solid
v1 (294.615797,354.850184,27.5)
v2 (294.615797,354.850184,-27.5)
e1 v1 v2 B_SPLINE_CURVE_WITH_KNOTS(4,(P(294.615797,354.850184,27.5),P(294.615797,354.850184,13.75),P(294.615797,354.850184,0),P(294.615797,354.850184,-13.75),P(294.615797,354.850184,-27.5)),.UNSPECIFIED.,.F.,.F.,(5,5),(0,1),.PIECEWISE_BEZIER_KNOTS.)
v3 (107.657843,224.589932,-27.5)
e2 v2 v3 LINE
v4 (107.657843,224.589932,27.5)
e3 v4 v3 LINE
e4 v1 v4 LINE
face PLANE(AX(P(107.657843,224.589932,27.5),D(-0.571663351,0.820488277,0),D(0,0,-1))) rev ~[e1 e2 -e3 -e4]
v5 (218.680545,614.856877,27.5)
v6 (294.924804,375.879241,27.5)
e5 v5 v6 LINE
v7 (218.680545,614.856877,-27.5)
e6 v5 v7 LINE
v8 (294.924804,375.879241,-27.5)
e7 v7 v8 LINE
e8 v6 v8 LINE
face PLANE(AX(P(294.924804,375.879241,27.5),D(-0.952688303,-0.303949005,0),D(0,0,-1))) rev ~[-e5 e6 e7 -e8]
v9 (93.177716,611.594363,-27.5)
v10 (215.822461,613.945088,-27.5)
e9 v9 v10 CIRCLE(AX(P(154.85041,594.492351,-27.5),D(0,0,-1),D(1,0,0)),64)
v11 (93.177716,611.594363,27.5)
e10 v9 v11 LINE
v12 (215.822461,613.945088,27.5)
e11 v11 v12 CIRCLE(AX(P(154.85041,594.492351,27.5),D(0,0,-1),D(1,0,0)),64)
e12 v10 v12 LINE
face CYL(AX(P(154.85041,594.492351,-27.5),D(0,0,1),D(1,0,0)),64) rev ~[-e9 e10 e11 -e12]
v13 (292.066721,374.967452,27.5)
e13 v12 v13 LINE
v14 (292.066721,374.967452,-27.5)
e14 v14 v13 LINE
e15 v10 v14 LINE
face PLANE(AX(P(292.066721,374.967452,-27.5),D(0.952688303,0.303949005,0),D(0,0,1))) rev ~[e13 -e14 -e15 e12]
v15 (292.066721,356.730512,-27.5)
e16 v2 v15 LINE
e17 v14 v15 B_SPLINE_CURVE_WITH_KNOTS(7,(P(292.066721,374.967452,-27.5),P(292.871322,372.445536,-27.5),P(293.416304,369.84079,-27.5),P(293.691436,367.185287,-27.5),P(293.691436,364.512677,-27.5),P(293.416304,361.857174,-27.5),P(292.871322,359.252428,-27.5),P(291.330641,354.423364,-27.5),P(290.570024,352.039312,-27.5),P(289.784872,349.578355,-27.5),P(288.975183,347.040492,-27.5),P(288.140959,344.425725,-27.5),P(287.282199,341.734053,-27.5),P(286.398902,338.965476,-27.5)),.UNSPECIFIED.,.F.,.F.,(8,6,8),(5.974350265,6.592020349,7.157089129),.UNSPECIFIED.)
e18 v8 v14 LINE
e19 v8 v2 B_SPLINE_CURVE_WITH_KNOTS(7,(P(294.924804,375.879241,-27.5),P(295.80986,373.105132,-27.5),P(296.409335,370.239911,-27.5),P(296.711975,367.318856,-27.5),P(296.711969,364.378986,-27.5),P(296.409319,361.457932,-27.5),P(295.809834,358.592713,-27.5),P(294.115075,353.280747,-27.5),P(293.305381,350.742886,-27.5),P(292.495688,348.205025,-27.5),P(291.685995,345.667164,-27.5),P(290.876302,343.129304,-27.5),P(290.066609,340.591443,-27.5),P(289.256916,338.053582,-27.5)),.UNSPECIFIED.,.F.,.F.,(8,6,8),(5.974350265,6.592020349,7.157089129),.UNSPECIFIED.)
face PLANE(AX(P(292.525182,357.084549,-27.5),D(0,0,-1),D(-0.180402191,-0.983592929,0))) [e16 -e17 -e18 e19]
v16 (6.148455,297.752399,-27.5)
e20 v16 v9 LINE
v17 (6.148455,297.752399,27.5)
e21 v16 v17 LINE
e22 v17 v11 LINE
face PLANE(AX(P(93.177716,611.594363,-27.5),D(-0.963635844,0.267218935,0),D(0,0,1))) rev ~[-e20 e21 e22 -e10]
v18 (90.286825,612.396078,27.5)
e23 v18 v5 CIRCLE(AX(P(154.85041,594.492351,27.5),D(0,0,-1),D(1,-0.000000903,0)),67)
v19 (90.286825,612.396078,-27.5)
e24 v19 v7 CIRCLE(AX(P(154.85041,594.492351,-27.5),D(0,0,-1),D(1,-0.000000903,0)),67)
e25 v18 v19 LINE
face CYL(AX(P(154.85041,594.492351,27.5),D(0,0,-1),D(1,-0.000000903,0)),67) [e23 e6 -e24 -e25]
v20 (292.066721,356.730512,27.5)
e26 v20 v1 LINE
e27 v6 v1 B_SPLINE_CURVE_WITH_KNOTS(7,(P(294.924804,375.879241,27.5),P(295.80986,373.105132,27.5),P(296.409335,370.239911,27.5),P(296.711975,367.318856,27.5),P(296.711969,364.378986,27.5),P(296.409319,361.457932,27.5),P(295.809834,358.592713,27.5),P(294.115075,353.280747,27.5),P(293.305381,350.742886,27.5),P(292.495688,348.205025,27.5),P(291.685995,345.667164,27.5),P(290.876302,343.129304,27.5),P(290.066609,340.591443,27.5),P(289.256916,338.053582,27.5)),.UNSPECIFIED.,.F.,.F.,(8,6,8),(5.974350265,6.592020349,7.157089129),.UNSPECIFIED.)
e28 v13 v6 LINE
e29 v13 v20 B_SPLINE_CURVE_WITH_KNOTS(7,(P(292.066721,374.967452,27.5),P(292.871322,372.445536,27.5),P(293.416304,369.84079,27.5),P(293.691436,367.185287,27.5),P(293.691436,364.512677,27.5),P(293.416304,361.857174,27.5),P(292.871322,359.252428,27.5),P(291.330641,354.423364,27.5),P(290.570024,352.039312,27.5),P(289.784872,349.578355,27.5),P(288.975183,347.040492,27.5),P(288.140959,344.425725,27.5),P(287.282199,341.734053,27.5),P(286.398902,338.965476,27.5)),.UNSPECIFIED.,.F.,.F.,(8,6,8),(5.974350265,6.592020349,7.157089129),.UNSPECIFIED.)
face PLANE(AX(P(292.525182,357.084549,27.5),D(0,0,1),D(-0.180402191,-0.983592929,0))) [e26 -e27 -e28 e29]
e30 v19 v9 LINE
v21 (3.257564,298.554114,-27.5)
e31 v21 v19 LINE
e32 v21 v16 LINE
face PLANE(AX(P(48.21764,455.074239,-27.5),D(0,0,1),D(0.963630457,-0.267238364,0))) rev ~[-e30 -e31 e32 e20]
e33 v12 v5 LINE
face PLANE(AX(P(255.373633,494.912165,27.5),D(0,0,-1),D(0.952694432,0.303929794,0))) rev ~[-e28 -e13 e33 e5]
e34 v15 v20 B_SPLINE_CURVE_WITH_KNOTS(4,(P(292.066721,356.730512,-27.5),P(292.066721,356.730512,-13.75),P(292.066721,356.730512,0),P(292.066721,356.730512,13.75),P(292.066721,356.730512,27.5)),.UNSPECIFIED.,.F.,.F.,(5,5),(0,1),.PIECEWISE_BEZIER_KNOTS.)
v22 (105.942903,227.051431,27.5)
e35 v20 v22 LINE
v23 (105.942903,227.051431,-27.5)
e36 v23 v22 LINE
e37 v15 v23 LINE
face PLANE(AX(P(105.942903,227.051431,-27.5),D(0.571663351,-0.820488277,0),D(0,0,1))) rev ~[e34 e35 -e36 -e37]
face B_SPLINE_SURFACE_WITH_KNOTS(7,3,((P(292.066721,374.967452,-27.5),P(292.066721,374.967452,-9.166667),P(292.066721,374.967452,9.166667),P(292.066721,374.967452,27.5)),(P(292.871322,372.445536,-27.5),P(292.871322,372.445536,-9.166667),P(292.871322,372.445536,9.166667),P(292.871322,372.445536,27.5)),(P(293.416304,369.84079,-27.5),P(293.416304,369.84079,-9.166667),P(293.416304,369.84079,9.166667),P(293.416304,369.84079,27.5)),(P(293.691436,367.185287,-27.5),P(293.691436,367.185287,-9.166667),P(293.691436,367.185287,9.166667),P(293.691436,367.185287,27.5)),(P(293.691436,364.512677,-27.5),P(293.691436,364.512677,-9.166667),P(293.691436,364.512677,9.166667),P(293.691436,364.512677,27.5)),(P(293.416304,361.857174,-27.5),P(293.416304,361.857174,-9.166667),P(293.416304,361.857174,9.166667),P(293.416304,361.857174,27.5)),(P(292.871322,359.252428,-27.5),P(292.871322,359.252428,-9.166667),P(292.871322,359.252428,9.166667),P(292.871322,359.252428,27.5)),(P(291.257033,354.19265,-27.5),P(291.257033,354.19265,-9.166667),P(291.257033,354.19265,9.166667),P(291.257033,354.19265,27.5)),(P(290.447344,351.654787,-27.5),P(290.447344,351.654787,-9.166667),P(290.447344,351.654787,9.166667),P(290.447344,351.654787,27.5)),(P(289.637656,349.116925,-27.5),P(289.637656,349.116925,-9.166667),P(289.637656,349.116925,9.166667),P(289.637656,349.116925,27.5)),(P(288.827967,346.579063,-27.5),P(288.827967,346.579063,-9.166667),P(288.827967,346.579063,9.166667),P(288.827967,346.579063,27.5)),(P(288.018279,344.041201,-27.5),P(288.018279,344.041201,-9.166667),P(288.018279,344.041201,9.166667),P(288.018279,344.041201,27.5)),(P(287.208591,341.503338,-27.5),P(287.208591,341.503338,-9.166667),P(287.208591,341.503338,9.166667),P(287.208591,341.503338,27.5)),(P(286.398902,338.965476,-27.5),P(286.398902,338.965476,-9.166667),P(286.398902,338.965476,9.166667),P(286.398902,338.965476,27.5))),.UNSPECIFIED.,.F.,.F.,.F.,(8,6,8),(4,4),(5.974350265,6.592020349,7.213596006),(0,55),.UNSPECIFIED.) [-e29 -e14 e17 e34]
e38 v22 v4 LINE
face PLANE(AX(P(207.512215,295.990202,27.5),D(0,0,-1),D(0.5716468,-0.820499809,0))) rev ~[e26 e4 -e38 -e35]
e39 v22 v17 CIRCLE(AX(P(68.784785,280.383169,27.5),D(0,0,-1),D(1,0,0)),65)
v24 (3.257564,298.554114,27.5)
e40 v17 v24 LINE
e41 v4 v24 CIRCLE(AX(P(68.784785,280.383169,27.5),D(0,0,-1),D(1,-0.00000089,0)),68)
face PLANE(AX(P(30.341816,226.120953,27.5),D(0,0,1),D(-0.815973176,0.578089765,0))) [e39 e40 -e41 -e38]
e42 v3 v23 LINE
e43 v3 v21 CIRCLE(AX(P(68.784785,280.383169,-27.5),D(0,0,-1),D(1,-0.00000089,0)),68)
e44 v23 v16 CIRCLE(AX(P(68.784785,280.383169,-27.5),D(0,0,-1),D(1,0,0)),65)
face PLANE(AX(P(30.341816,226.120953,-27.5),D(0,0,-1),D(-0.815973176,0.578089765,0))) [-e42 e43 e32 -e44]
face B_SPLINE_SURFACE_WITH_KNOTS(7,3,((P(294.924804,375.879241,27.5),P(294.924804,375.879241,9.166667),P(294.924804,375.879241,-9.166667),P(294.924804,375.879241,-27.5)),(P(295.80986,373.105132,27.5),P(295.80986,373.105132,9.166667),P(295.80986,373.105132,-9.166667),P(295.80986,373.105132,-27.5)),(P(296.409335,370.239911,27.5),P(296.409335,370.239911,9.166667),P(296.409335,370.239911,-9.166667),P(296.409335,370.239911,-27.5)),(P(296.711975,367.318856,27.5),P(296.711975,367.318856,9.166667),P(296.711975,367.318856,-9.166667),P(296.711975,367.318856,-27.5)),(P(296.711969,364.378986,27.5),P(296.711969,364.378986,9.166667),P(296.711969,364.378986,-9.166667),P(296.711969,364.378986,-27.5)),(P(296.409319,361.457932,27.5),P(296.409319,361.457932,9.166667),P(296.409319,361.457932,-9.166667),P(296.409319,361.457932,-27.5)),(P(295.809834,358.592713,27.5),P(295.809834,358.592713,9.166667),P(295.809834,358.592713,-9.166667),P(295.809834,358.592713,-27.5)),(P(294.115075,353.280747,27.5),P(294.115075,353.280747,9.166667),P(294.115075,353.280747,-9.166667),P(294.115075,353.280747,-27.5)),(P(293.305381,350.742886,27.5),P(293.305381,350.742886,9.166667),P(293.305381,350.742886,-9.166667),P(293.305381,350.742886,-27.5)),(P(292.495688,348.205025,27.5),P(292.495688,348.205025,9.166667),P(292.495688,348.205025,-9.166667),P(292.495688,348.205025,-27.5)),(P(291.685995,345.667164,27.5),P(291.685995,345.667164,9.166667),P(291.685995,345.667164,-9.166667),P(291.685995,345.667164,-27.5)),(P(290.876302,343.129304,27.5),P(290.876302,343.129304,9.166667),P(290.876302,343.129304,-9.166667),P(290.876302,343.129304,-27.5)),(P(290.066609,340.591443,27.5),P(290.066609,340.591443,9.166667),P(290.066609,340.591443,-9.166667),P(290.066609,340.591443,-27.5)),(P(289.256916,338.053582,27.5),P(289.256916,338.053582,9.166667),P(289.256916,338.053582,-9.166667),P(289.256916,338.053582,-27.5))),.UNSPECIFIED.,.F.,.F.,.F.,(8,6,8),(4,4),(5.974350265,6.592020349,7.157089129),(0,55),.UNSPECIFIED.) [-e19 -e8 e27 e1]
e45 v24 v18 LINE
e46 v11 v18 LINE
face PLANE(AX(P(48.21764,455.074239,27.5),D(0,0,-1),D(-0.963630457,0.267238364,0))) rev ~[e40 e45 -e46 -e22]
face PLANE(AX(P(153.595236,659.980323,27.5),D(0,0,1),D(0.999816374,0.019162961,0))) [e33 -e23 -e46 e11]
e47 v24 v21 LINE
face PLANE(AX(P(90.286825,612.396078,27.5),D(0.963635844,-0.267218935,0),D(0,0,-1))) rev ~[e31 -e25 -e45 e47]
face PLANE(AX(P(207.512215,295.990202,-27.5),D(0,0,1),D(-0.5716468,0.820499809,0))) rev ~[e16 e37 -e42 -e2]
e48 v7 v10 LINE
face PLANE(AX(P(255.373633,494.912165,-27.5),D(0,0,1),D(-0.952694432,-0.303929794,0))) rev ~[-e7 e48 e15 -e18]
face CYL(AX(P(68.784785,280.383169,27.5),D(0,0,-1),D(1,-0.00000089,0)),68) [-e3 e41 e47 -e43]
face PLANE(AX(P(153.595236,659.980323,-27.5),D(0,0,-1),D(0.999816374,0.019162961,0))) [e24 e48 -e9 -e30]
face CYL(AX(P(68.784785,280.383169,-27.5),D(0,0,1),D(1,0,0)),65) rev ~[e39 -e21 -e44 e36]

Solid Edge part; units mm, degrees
sketch "Sketch1" plane through (0, 0, 0) normal (0, 0, 1) x (1, 0, 0)
  arc A0 (93.177716, 611.594363) -> (215.822462, 613.945088) centre (154.85041, 594.492351) cw
  line L0 (292.066721, 374.967452) -> (215.822462, 613.945088)
  arc A1 (292.066721, 356.730512) -> (292.066721, 374.967452) centre (263.486072, 365.848982) ccw
  line L1 (105.942903, 227.051431) -> (292.066721, 356.730512)
  arc A2 (6.148455, 297.752399) -> (105.942903, 227.051431) centre (68.784785, 280.383169) ccw
  line L2 (93.177716, 611.594363) -> (6.148455, 297.752399)
  dimension "D1" = 64
  dimension "D2" = 65
  dimension "D3" = 30
sketch "Sketch2" plane through (93.177716, 611.594363, 0) normal (-0.2672189, -0.9636358, 0) x (-0.9636358, 0.2672189, 0)
  line L0 (0, -27.5) -> (3, -27.5)
  line L1 (3, -27.5) -> (3, 27.5)
  line L2 (3, 27.5) -> (0, 27.5)
  line L3 (0, 27.5) -> (0, -27.5)
  dimension "D1" = 3
  dimension "D2" = 3
sweep "SweptProtrusion1" add profiles "Sketch2" path "Sketch1"
properties material "Aluminum, 6061-T6"
